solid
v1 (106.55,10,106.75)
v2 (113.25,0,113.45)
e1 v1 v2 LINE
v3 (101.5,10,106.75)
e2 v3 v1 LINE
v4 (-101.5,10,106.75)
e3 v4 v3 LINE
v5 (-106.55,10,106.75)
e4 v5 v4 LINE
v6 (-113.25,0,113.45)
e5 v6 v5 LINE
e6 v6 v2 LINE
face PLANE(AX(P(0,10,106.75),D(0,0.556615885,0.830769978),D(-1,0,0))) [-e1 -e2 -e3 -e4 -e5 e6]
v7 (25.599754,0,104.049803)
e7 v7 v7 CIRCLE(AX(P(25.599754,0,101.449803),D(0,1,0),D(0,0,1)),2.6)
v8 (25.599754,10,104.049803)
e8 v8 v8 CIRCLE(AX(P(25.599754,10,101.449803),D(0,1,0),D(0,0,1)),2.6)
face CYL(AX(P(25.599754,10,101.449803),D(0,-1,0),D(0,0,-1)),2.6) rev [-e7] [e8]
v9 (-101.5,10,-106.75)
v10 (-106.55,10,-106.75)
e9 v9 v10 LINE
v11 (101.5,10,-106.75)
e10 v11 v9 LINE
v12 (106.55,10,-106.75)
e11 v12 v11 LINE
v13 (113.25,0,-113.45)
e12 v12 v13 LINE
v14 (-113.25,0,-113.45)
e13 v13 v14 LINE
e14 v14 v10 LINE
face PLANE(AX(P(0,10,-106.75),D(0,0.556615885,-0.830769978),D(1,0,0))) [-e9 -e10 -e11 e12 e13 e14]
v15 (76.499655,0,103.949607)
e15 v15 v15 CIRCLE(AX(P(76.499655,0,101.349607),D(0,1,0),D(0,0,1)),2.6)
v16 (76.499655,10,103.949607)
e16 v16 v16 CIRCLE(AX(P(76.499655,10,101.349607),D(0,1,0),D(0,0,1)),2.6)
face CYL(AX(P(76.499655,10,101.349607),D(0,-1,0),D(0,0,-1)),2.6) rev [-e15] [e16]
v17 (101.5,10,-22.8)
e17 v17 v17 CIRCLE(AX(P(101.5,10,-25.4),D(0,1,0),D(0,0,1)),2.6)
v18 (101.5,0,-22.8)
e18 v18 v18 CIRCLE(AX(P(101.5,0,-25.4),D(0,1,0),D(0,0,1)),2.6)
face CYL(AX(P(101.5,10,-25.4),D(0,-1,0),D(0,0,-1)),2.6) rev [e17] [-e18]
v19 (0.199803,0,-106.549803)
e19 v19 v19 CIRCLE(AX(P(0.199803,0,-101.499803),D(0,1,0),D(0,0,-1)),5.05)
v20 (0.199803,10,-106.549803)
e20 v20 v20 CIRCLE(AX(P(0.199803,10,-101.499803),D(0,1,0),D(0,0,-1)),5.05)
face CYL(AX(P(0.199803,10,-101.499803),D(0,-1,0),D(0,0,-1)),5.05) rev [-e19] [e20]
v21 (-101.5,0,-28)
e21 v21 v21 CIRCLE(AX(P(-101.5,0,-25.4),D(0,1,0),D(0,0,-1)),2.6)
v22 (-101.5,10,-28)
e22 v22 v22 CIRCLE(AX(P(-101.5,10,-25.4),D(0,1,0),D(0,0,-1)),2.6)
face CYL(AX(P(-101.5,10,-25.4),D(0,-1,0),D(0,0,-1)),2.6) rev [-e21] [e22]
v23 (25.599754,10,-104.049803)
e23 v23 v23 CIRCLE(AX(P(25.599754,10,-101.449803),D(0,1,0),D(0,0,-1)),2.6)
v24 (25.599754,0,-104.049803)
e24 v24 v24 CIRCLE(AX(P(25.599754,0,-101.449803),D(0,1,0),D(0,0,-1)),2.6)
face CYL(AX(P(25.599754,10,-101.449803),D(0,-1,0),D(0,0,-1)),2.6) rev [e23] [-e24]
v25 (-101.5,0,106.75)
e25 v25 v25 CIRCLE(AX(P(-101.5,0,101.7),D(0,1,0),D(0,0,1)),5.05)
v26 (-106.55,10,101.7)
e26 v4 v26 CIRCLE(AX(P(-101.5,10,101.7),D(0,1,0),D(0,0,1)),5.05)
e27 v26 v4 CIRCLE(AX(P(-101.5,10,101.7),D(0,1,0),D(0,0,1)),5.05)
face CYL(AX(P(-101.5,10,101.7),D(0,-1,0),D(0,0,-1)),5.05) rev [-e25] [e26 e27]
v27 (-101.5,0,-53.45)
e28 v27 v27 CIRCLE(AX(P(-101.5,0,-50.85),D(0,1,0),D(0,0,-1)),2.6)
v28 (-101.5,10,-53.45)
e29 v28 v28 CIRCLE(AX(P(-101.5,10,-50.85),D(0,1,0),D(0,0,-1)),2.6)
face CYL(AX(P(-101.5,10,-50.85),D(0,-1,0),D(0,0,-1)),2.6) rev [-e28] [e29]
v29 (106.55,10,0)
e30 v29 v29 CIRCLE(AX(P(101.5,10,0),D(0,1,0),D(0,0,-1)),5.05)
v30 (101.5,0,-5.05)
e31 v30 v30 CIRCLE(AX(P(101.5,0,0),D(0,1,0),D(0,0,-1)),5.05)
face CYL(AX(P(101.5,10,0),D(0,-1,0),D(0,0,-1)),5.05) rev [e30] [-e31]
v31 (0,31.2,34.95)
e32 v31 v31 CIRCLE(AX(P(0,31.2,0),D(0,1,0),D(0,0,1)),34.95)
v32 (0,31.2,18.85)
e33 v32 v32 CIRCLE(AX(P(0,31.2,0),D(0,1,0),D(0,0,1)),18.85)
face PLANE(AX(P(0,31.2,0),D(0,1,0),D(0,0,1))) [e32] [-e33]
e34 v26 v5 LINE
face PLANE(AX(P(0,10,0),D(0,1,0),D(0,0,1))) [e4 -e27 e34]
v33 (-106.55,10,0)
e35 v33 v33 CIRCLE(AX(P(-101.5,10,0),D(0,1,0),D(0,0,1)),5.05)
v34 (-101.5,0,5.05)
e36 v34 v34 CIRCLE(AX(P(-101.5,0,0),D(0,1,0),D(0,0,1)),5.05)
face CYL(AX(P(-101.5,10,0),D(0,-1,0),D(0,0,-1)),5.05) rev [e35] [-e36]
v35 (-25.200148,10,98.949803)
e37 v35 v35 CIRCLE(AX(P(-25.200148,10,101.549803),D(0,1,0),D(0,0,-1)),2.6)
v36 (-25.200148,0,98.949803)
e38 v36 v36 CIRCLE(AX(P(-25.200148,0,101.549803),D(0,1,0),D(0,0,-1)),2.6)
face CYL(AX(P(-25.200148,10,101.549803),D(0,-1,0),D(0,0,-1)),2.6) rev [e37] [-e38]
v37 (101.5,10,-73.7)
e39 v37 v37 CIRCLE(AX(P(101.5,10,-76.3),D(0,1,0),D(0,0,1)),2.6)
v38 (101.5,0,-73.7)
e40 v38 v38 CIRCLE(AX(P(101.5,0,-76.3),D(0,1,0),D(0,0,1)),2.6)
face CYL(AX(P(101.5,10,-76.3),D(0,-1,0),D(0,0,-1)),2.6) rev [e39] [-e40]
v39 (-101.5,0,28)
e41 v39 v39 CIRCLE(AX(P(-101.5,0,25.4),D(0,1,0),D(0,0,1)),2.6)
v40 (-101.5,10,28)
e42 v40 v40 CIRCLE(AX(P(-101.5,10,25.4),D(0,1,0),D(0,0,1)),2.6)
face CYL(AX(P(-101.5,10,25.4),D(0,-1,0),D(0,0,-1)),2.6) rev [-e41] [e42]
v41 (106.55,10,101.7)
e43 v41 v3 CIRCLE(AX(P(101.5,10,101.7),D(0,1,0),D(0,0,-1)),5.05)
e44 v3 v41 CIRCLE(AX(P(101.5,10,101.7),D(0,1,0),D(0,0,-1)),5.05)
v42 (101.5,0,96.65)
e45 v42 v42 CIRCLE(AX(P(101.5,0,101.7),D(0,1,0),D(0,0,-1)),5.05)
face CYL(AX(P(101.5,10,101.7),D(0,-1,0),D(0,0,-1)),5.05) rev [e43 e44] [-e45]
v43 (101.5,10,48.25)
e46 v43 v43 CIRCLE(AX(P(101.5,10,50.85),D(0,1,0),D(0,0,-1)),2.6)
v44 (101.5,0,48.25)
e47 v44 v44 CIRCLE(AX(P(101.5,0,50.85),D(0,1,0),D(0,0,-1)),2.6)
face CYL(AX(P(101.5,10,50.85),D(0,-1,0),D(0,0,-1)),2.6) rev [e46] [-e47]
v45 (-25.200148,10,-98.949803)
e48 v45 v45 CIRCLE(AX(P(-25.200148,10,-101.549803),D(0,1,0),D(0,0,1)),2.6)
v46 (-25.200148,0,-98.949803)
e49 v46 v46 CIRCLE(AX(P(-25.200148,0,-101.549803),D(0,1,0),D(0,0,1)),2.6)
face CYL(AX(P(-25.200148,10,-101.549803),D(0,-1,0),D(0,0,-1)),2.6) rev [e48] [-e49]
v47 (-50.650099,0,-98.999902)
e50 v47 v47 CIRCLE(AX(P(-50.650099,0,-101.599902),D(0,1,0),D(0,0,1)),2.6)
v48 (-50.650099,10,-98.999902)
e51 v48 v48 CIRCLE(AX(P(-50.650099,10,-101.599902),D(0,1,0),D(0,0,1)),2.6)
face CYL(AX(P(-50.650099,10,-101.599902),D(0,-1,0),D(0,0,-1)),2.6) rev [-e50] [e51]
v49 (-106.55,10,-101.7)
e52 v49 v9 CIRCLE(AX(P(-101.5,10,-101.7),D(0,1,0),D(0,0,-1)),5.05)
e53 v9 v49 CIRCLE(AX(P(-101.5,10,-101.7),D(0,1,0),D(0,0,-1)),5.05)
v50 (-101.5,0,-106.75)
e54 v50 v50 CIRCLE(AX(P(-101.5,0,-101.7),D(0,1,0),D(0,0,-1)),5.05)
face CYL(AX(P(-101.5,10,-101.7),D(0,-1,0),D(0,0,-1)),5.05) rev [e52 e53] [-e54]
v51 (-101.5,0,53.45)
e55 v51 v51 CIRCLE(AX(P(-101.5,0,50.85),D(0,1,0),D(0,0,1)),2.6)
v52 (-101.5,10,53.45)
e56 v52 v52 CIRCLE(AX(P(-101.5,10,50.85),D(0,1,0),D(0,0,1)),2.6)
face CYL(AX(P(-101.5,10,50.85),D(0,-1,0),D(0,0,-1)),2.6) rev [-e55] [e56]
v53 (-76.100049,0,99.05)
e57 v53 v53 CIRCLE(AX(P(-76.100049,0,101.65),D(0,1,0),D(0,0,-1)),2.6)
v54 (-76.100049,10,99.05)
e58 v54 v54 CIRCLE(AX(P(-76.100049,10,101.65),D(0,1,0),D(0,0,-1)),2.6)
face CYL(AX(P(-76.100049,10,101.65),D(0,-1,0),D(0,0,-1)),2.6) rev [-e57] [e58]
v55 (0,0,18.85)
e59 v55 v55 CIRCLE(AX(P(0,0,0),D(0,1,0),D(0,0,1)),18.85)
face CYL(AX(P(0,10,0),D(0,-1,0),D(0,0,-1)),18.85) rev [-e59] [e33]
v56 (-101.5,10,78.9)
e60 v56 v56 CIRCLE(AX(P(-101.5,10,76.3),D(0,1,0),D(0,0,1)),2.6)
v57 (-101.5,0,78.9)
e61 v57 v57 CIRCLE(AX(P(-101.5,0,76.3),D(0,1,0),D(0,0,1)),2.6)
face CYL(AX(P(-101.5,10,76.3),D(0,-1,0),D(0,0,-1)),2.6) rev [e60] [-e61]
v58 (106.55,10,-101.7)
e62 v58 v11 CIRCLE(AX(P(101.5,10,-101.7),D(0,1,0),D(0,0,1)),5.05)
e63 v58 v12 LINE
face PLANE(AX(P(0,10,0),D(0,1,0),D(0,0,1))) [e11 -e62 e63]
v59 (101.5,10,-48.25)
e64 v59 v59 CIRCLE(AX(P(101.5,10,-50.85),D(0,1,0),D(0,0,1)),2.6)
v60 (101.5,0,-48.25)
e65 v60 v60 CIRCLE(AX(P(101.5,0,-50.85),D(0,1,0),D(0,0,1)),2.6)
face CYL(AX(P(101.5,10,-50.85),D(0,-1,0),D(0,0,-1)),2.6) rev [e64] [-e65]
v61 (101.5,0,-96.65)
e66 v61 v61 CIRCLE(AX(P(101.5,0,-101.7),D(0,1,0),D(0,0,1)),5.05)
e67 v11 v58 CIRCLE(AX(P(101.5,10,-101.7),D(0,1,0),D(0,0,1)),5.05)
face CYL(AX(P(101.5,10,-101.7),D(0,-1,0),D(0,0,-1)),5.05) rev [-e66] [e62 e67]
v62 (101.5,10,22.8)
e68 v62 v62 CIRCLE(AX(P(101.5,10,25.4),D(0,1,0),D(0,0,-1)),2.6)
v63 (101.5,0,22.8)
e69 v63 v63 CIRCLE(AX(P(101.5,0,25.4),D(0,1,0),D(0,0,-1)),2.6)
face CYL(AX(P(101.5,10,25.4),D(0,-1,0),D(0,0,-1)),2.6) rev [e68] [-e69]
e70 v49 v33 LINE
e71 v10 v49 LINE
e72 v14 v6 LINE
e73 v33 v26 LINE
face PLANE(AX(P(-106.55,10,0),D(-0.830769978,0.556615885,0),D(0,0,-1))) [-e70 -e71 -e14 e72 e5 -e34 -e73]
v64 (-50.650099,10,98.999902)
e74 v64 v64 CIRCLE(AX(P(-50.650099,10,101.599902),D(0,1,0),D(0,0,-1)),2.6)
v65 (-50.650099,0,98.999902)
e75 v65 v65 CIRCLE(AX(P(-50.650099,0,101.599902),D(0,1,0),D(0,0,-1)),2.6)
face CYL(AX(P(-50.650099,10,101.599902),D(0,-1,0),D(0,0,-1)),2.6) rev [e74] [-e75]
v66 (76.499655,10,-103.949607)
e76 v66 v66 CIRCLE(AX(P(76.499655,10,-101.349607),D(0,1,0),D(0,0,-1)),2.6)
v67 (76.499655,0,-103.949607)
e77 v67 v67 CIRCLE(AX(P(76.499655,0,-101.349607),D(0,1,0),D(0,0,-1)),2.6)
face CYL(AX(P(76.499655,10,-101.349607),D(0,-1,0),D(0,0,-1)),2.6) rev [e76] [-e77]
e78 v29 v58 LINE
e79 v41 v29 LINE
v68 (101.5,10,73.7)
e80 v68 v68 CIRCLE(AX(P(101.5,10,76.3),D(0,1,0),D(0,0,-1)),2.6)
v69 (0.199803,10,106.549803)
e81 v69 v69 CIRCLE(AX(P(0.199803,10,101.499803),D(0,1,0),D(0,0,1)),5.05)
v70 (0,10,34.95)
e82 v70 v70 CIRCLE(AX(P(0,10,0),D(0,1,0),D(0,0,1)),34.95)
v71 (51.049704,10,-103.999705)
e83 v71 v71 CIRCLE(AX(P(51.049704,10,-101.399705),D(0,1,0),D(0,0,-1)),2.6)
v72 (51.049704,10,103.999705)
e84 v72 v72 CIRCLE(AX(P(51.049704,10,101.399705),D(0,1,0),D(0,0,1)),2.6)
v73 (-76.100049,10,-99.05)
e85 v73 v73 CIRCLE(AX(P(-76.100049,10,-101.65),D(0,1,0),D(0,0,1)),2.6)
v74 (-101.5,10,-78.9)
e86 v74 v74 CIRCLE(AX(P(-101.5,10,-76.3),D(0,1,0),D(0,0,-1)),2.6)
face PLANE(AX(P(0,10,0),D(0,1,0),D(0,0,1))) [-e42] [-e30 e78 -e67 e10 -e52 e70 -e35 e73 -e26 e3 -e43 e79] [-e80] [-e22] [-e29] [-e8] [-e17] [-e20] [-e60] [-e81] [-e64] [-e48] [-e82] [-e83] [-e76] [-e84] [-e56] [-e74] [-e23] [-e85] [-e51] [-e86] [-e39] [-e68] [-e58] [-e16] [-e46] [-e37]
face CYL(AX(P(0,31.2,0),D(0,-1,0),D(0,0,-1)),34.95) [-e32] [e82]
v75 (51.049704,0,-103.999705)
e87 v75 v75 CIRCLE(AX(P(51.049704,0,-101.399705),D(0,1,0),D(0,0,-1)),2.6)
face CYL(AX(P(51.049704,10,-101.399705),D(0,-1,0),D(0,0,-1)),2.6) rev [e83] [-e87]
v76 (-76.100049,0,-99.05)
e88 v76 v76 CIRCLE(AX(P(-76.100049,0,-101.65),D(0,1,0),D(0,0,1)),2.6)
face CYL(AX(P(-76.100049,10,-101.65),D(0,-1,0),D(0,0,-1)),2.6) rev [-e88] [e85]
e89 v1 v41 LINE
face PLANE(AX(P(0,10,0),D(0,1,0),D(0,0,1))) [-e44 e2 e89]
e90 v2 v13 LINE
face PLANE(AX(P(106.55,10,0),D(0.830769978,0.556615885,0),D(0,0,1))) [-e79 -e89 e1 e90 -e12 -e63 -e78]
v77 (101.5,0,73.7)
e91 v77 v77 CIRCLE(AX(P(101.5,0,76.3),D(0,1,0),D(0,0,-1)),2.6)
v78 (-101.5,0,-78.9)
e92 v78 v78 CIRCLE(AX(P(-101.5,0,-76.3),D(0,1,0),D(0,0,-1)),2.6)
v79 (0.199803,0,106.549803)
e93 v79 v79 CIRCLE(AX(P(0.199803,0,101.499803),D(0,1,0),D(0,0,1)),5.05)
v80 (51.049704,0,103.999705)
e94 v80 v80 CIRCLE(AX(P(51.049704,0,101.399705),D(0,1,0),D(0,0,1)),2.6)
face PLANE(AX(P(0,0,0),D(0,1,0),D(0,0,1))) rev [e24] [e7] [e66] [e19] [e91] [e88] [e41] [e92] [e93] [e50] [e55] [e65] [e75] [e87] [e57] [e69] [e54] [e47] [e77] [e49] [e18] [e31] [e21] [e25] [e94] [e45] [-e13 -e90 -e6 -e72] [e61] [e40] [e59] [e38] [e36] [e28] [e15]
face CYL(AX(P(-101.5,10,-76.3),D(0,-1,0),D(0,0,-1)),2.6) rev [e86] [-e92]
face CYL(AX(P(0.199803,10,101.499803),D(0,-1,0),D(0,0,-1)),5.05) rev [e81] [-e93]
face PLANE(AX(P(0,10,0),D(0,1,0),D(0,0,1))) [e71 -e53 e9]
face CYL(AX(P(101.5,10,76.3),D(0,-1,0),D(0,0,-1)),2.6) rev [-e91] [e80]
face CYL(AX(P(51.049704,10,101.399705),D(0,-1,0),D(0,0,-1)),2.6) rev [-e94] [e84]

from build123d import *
from OCP.BRepFilletAPI import BRepFilletAPI_MakeChamfer

# Parameters (mm, degrees)
CROQUIS1_W              = 226.5
CROQUIS1_H              = 226.9
CROQUIS1_R              = 18.85
CROQUIS1_R_2            = 5.05
CROQUIS1_R_3            = 2.6
SALIENTE_EXTRUIR1_DEPTH = 10
CHAFL_N1_SIZE           = 10
CHAFL_N1_SIZE_2         = 6.7
CROQUIS5_R              = 34.95
CROQUIS5_R_2            = 18.85
SALIENTE_EXTRUIR7_DEPTH = 21.2


with BuildPart() as part:
    # Croquis1 → Saliente-Extruir1 (new body)
    with BuildSketch(Plane(origin=(0, 0, 0), x_dir=(1, 0, 0), z_dir=(0, 1, 0))):
        Rectangle(CROQUIS1_W, CROQUIS1_H)
        with Locations(Location((0, 0, 0), (0, 0, 270))):
            Circle(CROQUIS1_R, mode=Mode.SUBTRACT)
        with Locations(Location((-101.5, 0, 0), (0, 0, 270))):
            Circle(CROQUIS1_R_2, mode=Mode.SUBTRACT)
        with Locations(Location((-101.5, -25.4, 0), (0, 0, 270))):
            Circle(CROQUIS1_R_3, mode=Mode.SUBTRACT)
        with Locations(Location((-101.5, -50.85, 0), (0, 0, 270))):
            Circle(CROQUIS1_R_3, mode=Mode.SUBTRACT)
        with Locations(Location((-101.5, -76.3, 0), (0, 0, 270))):
            Circle(CROQUIS1_R_3, mode=Mode.SUBTRACT)
        with Locations(Location((-101.5, -101.7, 0), (0, 0, 270))):
            Circle(CROQUIS1_R_2, mode=Mode.SUBTRACT)
        with Locations(Location((-101.5, 101.7, 0), (0, 0, 90))):
            Circle(CROQUIS1_R_2, mode=Mode.SUBTRACT)
        with Locations(Location((-101.5, 76.3, 0), (0, 0, 90))):
            Circle(CROQUIS1_R_3, mode=Mode.SUBTRACT)
        with Locations(Location((-101.5, 50.85, 0), (0, 0, 90))):
            Circle(CROQUIS1_R_3, mode=Mode.SUBTRACT)
        with Locations(Location((-101.5, 25.4, 0), (0, 0, 90))):
            Circle(CROQUIS1_R_3, mode=Mode.SUBTRACT)
        with Locations(Location((101.5, -101.7, 0), (0, 0, 90))):
            Circle(CROQUIS1_R_2, mode=Mode.SUBTRACT)
        with Locations(Location((101.5, -76.3, 0), (0, 0, 90))):
            Circle(CROQUIS1_R_3, mode=Mode.SUBTRACT)
        with Locations(Location((101.5, -50.85, 0), (0, 0, 90))):
            Circle(CROQUIS1_R_3, mode=Mode.SUBTRACT)
        with Locations(Location((101.5, -25.4, 0), (0, 0, 90))):
            Circle(CROQUIS1_R_3, mode=Mode.SUBTRACT)
        with Locations(Location((101.5, 0, 0), (0, 0, 90))):
            Circle(CROQUIS1_R_2, mode=Mode.SUBTRACT)
        with Locations(Location((101.5, 25.4, 0), (0, 0, 270))):
            Circle(CROQUIS1_R_3, mode=Mode.SUBTRACT)
        with Locations(Location((101.5, 50.85, 0), (0, 0, 270))):
            Circle(CROQUIS1_R_3, mode=Mode.SUBTRACT)
        with Locations(Location((101.5, 76.3, 0), (0, 0, 270))):
            Circle(CROQUIS1_R_3, mode=Mode.SUBTRACT)
        with Locations(Location((101.5, 101.7, 0), (0, 0, 270))):
            Circle(CROQUIS1_R_2, mode=Mode.SUBTRACT)
        with Locations(Location((76.499655125, 101.349606639, 0), (0, 0, 90))):
            Circle(CROQUIS1_R_3, mode=Mode.SUBTRACT)
        with Locations(Location((51.049704434, 101.399705015, 0), (0, 0, 90))):
            Circle(CROQUIS1_R_3, mode=Mode.SUBTRACT)
        with Locations(Location((25.599753743, 101.449803392, 0), (0, 0, 90))):
            Circle(CROQUIS1_R_3, mode=Mode.SUBTRACT)
        with Locations(Location((0.199802956, 101.499803344, 0), (0, 0, 90))):
            Circle(CROQUIS1_R_2, mode=Mode.SUBTRACT)
        with Locations(Location((-25.200147831, 101.549803295, 0), (0, 0, 270))):
            Circle(CROQUIS1_R_3, mode=Mode.SUBTRACT)
        with Locations(Location((-50.650098522, 101.599901672, 0), (0, 0, 270))):
            Circle(CROQUIS1_R_3, mode=Mode.SUBTRACT)
        with Locations(Location((-76.100049213, 101.650000048, 0), (0, 0, 270))):
            Circle(CROQUIS1_R_3, mode=Mode.SUBTRACT)
        with Locations(Location((76.499655125, -101.349606639, 0), (0, 0, 270))):
            Circle(CROQUIS1_R_3, mode=Mode.SUBTRACT)
        with Locations(Location((51.049704434, -101.399705015, 0), (0, 0, 270))):
            Circle(CROQUIS1_R_3, mode=Mode.SUBTRACT)
        with Locations(Location((25.599753743, -101.449803392, 0), (0, 0, 270))):
            Circle(CROQUIS1_R_3, mode=Mode.SUBTRACT)
        with Locations(Location((0.199802956, -101.499803344, 0), (0, 0, 270))):
            Circle(CROQUIS1_R_2, mode=Mode.SUBTRACT)
        with Locations(Location((-25.200147831, -101.549803295, 0), (0, 0, 90))):
            Circle(CROQUIS1_R_3, mode=Mode.SUBTRACT)
        with Locations(Location((-50.650098522, -101.599901672, 0), (0, 0, 90))):
            Circle(CROQUIS1_R_3, mode=Mode.SUBTRACT)
        with Locations(Location((-76.100049213, -101.650000048, 0), (0, 0, 90))):
            Circle(CROQUIS1_R_3, mode=Mode.SUBTRACT)
    extrude(amount=SALIENTE_EXTRUIR1_DEPTH)

    # Chaflán1
    chafl_n1_edges_1 = [part.edges().sort_by_distance(p)[0] for p in [
        (0, 10, -113.45),
    ]]
    chafl_n1_side_1 = [part.faces().sort_by_distance(p)[0] for p in [
        (0, 9.866, -113.45),
    ]]
    chafl_n1_edges_2 = [part.edges().sort_by_distance(p)[0] for p in [
        (113.25, 10, 0),
    ]]
    chafl_n1_side_2 = [part.faces().sort_by_distance(p)[0] for p in [
        (113.25, 9.866, 0),
    ]]
    chafl_n1_edges_3 = [part.edges().sort_by_distance(p)[0] for p in [
        (0, 10, 113.45),
    ]]
    chafl_n1_side_3 = [part.faces().sort_by_distance(p)[0] for p in [
        (0, 9.866, 113.45),
    ]]
    chafl_n1_edges_4 = [part.edges().sort_by_distance(p)[0] for p in [
        (-113.25, 10, 0),
    ]]
    chafl_n1_side_4 = [part.faces().sort_by_distance(p)[0] for p in [
        (-113.25, 9.866, 0),
    ]]
    chafl_n1 = BRepFilletAPI_MakeChamfer(part.part.solid().wrapped)
    for e in chafl_n1_edges_1:
        chafl_n1.Add(CHAFL_N1_SIZE - 0.0001, CHAFL_N1_SIZE_2 - 0.0001, e.wrapped, chafl_n1_side_1[0].wrapped)
    for e in chafl_n1_edges_2:
        chafl_n1.Add(CHAFL_N1_SIZE - 0.0001, CHAFL_N1_SIZE_2 - 0.0001, e.wrapped, chafl_n1_side_2[0].wrapped)
    for e in chafl_n1_edges_3:
        chafl_n1.Add(CHAFL_N1_SIZE - 0.0001, CHAFL_N1_SIZE_2 - 0.0001, e.wrapped, chafl_n1_side_3[0].wrapped)
    for e in chafl_n1_edges_4:
        chafl_n1.Add(CHAFL_N1_SIZE - 0.0001, CHAFL_N1_SIZE_2 - 0.0001, e.wrapped, chafl_n1_side_4[0].wrapped)
    add(Compound.cast(chafl_n1.Shape()), mode=Mode.REPLACE)  # a hair under: the kernel refuses the full size

    # Croquis5 → Saliente-Extruir7 (add)
    with BuildSketch(Plane(origin=(0, 10, 0), x_dir=(1, 0, 0), z_dir=(0, 1, 0))):
        with Locations(Location((0, 0, 0), (0, 0, 270))):
            Circle(CROQUIS5_R)
        with Locations(Location((0, 0, 0), (0, 0, 270))):
            Circle(CROQUIS5_R_2, mode=Mode.SUBTRACT)
    extrude(amount=SALIENTE_EXTRUIR7_DEPTH)


solid = part.part
